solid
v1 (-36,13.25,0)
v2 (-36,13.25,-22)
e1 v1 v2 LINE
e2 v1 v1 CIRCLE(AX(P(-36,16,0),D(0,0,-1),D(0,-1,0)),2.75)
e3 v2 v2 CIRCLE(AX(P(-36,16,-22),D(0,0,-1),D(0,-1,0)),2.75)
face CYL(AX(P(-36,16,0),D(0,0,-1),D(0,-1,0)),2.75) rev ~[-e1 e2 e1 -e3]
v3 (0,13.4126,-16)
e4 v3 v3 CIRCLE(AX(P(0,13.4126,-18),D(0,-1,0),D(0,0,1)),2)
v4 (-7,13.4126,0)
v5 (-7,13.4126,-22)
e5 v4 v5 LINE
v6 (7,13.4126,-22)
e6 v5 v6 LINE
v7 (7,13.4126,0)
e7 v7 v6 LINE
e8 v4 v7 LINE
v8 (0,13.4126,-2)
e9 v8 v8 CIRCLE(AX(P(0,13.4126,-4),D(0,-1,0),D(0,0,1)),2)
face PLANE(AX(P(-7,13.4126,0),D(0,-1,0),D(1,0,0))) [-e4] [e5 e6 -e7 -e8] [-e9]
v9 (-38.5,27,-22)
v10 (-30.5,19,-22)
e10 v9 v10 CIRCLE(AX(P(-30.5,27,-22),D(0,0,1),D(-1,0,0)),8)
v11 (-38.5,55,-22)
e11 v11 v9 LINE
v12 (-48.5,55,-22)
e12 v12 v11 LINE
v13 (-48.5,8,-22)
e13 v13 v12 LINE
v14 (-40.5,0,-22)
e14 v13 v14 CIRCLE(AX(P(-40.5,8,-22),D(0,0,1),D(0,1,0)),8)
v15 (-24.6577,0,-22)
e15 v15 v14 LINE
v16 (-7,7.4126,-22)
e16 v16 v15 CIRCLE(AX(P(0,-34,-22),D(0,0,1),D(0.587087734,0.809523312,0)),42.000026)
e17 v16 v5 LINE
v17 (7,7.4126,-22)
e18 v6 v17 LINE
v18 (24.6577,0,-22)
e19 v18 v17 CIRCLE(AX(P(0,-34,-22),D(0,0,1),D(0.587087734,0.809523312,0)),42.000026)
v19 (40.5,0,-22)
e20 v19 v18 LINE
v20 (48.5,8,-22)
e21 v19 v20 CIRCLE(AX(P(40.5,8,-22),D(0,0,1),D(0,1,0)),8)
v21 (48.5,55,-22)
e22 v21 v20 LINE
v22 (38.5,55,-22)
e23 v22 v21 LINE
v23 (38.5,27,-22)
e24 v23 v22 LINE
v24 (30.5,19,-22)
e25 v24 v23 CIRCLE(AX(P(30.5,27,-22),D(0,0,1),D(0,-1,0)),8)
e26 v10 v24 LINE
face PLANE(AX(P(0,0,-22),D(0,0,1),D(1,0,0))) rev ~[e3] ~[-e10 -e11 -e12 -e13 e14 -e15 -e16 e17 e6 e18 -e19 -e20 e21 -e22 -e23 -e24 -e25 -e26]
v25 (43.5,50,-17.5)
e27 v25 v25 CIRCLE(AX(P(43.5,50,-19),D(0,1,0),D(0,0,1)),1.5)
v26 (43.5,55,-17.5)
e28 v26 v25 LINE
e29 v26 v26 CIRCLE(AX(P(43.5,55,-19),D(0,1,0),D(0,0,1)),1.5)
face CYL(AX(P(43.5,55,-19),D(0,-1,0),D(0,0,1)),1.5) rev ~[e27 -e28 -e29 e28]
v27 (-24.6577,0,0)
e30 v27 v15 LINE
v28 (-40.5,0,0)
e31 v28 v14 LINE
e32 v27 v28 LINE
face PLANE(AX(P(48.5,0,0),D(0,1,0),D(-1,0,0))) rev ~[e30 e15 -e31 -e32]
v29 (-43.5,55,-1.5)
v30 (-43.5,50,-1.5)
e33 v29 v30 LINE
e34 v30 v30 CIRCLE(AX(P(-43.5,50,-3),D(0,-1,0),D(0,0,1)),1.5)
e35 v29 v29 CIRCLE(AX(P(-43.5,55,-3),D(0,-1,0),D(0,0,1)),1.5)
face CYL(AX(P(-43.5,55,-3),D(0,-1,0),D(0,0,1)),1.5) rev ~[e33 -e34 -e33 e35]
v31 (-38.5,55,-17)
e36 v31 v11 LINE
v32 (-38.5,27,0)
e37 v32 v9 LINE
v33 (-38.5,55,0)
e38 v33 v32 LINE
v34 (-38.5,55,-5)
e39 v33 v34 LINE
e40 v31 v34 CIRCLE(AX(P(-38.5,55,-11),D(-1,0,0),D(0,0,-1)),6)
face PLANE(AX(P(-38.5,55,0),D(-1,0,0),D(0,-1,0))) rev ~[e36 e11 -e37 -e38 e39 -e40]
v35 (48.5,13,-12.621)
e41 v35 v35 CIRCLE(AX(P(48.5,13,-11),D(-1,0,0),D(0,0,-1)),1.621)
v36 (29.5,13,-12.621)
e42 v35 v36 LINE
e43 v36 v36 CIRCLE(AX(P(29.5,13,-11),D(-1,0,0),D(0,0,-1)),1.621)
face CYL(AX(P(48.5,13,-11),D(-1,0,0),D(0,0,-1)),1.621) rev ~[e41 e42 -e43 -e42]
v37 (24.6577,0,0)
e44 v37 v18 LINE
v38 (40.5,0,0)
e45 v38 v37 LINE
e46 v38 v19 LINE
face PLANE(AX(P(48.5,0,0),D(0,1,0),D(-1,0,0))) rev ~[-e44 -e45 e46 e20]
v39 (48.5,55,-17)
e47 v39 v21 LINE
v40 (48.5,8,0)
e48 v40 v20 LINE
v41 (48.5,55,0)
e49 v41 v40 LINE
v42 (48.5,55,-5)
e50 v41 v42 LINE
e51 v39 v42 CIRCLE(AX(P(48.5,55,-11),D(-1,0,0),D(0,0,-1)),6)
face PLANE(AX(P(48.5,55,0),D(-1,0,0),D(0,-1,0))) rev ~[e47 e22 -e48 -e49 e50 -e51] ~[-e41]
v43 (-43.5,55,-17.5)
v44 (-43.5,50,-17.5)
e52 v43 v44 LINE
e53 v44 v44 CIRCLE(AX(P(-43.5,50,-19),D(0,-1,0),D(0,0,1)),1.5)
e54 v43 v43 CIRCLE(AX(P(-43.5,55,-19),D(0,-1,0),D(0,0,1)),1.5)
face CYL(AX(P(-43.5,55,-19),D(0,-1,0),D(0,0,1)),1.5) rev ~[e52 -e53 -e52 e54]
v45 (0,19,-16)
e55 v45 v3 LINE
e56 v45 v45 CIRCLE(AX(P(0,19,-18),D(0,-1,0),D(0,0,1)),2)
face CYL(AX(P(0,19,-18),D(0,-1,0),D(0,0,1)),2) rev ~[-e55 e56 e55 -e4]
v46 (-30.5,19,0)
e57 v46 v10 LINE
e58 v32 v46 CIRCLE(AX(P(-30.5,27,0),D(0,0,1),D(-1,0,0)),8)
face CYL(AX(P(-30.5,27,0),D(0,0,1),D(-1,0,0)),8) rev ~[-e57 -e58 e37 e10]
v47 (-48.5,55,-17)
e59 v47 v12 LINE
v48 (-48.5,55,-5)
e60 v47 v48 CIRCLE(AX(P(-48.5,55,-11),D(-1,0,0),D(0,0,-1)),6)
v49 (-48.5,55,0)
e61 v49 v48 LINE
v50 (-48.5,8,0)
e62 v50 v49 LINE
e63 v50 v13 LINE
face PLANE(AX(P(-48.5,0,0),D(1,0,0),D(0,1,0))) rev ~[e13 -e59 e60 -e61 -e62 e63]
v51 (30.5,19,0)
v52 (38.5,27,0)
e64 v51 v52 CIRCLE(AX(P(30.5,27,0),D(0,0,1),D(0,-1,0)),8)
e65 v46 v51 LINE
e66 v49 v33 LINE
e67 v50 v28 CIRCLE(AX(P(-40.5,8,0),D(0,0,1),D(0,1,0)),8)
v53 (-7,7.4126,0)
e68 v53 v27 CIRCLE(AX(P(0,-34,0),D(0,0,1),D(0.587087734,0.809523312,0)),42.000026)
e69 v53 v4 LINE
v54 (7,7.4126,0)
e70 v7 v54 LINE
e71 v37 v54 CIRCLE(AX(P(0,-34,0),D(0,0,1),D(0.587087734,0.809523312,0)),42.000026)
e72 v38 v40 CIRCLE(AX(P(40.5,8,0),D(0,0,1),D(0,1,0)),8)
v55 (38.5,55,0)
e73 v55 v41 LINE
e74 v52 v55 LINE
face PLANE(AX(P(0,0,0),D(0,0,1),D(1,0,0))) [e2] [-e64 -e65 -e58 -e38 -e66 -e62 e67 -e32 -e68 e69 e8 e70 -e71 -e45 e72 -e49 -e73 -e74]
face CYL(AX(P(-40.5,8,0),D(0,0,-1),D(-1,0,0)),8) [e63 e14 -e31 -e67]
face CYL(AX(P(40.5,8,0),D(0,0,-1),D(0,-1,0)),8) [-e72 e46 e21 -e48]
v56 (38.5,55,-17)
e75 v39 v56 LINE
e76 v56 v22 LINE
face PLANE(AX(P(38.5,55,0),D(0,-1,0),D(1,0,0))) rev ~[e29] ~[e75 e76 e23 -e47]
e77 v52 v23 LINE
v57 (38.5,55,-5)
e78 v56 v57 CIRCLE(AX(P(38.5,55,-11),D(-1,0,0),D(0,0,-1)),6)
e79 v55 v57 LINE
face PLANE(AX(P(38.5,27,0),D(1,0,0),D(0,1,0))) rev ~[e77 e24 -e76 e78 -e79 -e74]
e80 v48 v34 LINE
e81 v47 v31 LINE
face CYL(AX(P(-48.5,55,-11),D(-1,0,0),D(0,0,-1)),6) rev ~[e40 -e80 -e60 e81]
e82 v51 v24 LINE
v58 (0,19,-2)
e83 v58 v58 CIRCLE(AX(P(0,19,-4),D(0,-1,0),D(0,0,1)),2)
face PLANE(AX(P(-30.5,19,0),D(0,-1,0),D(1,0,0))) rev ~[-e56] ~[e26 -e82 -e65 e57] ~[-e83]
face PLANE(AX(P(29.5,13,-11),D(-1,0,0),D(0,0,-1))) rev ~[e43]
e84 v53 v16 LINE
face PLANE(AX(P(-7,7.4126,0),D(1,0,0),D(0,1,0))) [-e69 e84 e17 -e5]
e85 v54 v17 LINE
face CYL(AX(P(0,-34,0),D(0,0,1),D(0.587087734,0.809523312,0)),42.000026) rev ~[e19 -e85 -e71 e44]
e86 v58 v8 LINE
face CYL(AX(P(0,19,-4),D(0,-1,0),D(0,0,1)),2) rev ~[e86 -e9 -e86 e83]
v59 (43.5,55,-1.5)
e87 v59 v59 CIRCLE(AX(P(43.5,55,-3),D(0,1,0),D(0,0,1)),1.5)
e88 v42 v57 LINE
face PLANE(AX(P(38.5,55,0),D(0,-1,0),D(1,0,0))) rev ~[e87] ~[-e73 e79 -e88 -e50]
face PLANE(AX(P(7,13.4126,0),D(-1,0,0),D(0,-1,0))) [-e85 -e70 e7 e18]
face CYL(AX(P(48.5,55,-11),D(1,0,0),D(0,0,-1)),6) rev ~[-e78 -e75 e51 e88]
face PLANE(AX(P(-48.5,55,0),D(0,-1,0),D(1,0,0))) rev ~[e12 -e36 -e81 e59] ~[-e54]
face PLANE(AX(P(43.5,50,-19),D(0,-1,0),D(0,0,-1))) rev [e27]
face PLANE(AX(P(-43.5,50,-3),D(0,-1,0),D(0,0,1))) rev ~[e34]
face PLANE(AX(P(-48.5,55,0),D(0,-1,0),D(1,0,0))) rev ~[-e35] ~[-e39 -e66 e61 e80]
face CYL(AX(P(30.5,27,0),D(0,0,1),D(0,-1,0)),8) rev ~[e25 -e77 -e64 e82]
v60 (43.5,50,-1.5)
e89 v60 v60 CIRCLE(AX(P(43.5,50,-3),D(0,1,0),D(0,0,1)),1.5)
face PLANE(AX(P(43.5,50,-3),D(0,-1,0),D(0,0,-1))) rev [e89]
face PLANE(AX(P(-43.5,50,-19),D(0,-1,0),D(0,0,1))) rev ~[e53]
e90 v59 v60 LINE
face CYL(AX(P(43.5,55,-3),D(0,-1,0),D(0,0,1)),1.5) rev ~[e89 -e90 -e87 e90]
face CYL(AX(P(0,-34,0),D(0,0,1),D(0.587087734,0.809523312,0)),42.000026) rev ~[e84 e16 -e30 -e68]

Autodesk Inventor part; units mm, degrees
ref_plane "YZ Plane" through (0, 0, 0) normal (1, 0, 0) x (0, 1, 0)
ref_plane "XZ Plane" through (0, 0, 0) normal (0, 1, 0) x (-1, 0, 0)
ref_plane "XY Plane" through (0, 0, 0) normal (0, 0, 1) x (1, 0, 0)
sketch "Sketch1" plane through (0, 0, 0) normal (0, 0, 1) x (1, 0, 0)
  line L0 (-48.5, 0) -> (-48.5, 55)
  line L1 (-48.5, 55) -> (-38.5, 55)
  line L2 (-38.5, 55) -> (-38.5, 27)
  line L3 (-30.5, 19) -> (30.5, 19)
  line L4 (38.5, 27) -> (38.5, 55)
  line L5 (38.5, 55) -> (48.5, 55)
  line L6 (48.5, 55) -> (48.5, 0)
  line L7 (48.5, 0) -> (-48.5, 0)
  arc A0 (-38.5, 27) -> (-30.5, 19) centre (-30.5, 27) ccw
  arc A1 (30.5, 19) -> (38.5, 27) centre (30.5, 27) ccw
  line L8 (0, 0) -> (0, 59.4805) construction
  point P0 (0, 0)
  point P1 (0, 19)
  dimension "d0" = 10
  dimension "d1" = 19
  dimension "d2" = 36
  dimension "d3" = 8
  dimension "d4" = 97
extrude "Extrusion1" add sketch "Sketch1" against normal blind 22
sketch "Sketch2" plane through (0, 0, 0) normal (0, 0, 1) x (1, 0, 0)
  arc A0 (24.6577, 0) -> (-24.6577, 0) centre (0, -34) ccw
  line L0 (-48.5, 0) -> (48.5, 0) projected
  line L1 (-24.6577, 0) -> (24.6577, 0)
  point P0 (0, 0)
  point P1 (0, 0)
  point P2 (0, 0)
  point P3 (-24.6577, 0)
  point P4 (24.6577, 0)
  dimension "d7" = 84
  dimension "d8" = 8
extrude "Extrusion2" cut sketch "Sketch2" against normal up to surface (22 mm away)
sketch "Sketch3" plane through (0, 0, 0) normal (0, 0, 1) x (1, 0, 0)
  arc A0 (24.6577, 0) -> (-24.6577, 0) centre (0, -34) ccw projected
  line L0 (-7, 7.4126) -> (-7, 13.4126)
  line L1 (-7, 13.4126) -> (7, 13.4126)
  line L2 (7, 13.4126) -> (7, 7.4126)
  line L3 (0, 0) -> (0, 19) construction
  line L4 (30.5, 19) -> (-30.5, 19) projected
  dimension "d11" = 14
  dimension "d12" = 6
extrude "Extrusion3" cut sketch "Sketch3" against normal up to surface (22 mm away)
sketch "Sketch4" plane through (0, 0, 0) normal (0, 0, 1) x (1, 0, 0)
  line L0 (-48.5, 55) -> (-48.5, 0) projected
  line L1 (-48.5, 0) -> (-24.6577, 0) projected
  point P0 (0, 0)
  point P1 (-36, 16)
  dimension "d22" = 12.5
  dimension "d23" = 16
hole "Hole1" at (-36, 16, 0) direction (0, 0, -1) diameter 5.5 depth 22
sketch "Sketch5" plane through (-48.5, 0, 0) normal (-1, 0, 0) x (0, 0, 1)
  line L0 (0, 55) -> (-22, 55) projected
  arc A0 (-17, 55) -> (-5, 55) centre (-11, 55) ccw
  line L1 (-17, 55) -> (-5, 55)
  point P0 (0, 0)
  point P1 (-5, 55)
  dimension "d24" = 12
extrude "Extrusion4" cut sketch "Sketch5" against normal up to surface (10 mm away)
mirror "Mirror1" about plane through (0, 0, 0) normal (1, 0, 0) of "Extrusion4"
sketch "Sketch6" plane through (-48.5, 55, 0) normal (0, 1, 0) x (1, 0, 0)
  line L0 (0, 5) -> (0, 17) projected
  line L1 (0, 22) -> (10, 22) projected
  point P0 (48.5, 0)
  point P1 (5, 19)
  point P2 (5, 3)
  point P3 (0, 11)
  point P4 (5, 22)
  dimension "d27" = 8
  dimension "d28" = 8
hole "Hole2" at (-43.5, 55, -19) at (-43.5, 55, -3) direction (0, -1, 0) diameter 3 depth 5
mirror "Mirror2" about plane through (0, 0, 0) normal (1, 0, 0) of "Hole2"
fillet "Fillet1" radius 8 2 edges at (48.5, 0, -11) (-48.5, 0, -11)
sketch "Sketch7" plane through (48.5, 55, -11) normal (1, 0, 0) x (0, 0, -1)
  line L0 (-11, -55) -> (11, -55) projected
  point P0 (0, -42)
  point P1 (0, -55)
  dimension "d44" = 13
hole "Hole3" at (48.5, 13, -11) direction (-1, 0, 0) diameter 3.242 depth 19 thread size "M4x0.7" class "6H" standard "ISO Metric profile"
sketch "Sketch8" plane through (-30.5, 19, 0) normal (0, 1, 0) x (1, 0, 0)
  line L0 (-8, 17) -> (-8, 5) projected
  circle A0 centre (-13, 3) radius 1.5 projected
  circle A1 centre (-13, 19) radius 1.5 projected
  point P0 (30.5, 0)
  point P1 (30.5, 18)
  point P2 (30.5, 4)
  point P3 (-8, 11)
  dimension "d52" = 7
  dimension "d53" = 7
  dimension "d54" = 43.5
  dimension "d55" = 43.5
hole "Hole4" at (0, 19, -18) at (0, 19, -4) direction (0, -1, 0) diameter 4 end through all
sketch "Skizze9" plane through (0, 0, 0) normal (0, 0, 1) x (1, 0, 0)
  circle A0 centre (-36, 16) radius 2.75 projected
  arc A1 (-48.5, 8) -> (-40.5, 0) centre (-40.5, 8) ccw projected
  line L0 (-40.5, 0) -> (-24.6577, 0) projected
  arc A2 (-7, 7.4126) -> (-24.6577, 0) centre (0, -34) ccw projected
  line L1 (-7, 7.4126) -> (-7, 13.4126) projected
  line L2 (-7, 13.4126) -> (7, 13.4126) projected
  line L3 (7, 13.4126) -> (7, 7.4126) projected
  arc A3 (24.6577, 0) -> (7, 7.4126) centre (0, -34) ccw projected
  line L4 (24.6577, 0) -> (40.5, 0) projected
  arc A4 (40.5, 0) -> (48.5, 8) centre (40.5, 8) ccw projected
  line L5 (48.5, 8) -> (48.5, 55) projected
  line L6 (48.5, 55) -> (38.5, 55) projected
  line L7 (38.5, 55) -> (38.5, 27) projected
  arc A5 (30.5, 19) -> (38.5, 27) centre (30.5, 27) ccw projected
  line L8 (30.5, 19) -> (-30.5, 19) projected
  arc A6 (-38.5, 27) -> (-30.5, 19) centre (-30.5, 27) ccw projected
  line L9 (-38.5, 27) -> (-38.5, 55) projected
  line L10 (-38.5, 55) -> (-48.5, 55) projected
  line L11 (-48.5, 55) -> (-48.5, 8) projected
  arc A7 (24.6577, 0) -> (-24.6577, 0) centre (0, -34) ccw
  point P0 (0, 0)
equation "\"d28\" = d27"
equation "\"d53\" = d52"
properties part number "145 part 2" material "Aluminum 6061-AHC"
